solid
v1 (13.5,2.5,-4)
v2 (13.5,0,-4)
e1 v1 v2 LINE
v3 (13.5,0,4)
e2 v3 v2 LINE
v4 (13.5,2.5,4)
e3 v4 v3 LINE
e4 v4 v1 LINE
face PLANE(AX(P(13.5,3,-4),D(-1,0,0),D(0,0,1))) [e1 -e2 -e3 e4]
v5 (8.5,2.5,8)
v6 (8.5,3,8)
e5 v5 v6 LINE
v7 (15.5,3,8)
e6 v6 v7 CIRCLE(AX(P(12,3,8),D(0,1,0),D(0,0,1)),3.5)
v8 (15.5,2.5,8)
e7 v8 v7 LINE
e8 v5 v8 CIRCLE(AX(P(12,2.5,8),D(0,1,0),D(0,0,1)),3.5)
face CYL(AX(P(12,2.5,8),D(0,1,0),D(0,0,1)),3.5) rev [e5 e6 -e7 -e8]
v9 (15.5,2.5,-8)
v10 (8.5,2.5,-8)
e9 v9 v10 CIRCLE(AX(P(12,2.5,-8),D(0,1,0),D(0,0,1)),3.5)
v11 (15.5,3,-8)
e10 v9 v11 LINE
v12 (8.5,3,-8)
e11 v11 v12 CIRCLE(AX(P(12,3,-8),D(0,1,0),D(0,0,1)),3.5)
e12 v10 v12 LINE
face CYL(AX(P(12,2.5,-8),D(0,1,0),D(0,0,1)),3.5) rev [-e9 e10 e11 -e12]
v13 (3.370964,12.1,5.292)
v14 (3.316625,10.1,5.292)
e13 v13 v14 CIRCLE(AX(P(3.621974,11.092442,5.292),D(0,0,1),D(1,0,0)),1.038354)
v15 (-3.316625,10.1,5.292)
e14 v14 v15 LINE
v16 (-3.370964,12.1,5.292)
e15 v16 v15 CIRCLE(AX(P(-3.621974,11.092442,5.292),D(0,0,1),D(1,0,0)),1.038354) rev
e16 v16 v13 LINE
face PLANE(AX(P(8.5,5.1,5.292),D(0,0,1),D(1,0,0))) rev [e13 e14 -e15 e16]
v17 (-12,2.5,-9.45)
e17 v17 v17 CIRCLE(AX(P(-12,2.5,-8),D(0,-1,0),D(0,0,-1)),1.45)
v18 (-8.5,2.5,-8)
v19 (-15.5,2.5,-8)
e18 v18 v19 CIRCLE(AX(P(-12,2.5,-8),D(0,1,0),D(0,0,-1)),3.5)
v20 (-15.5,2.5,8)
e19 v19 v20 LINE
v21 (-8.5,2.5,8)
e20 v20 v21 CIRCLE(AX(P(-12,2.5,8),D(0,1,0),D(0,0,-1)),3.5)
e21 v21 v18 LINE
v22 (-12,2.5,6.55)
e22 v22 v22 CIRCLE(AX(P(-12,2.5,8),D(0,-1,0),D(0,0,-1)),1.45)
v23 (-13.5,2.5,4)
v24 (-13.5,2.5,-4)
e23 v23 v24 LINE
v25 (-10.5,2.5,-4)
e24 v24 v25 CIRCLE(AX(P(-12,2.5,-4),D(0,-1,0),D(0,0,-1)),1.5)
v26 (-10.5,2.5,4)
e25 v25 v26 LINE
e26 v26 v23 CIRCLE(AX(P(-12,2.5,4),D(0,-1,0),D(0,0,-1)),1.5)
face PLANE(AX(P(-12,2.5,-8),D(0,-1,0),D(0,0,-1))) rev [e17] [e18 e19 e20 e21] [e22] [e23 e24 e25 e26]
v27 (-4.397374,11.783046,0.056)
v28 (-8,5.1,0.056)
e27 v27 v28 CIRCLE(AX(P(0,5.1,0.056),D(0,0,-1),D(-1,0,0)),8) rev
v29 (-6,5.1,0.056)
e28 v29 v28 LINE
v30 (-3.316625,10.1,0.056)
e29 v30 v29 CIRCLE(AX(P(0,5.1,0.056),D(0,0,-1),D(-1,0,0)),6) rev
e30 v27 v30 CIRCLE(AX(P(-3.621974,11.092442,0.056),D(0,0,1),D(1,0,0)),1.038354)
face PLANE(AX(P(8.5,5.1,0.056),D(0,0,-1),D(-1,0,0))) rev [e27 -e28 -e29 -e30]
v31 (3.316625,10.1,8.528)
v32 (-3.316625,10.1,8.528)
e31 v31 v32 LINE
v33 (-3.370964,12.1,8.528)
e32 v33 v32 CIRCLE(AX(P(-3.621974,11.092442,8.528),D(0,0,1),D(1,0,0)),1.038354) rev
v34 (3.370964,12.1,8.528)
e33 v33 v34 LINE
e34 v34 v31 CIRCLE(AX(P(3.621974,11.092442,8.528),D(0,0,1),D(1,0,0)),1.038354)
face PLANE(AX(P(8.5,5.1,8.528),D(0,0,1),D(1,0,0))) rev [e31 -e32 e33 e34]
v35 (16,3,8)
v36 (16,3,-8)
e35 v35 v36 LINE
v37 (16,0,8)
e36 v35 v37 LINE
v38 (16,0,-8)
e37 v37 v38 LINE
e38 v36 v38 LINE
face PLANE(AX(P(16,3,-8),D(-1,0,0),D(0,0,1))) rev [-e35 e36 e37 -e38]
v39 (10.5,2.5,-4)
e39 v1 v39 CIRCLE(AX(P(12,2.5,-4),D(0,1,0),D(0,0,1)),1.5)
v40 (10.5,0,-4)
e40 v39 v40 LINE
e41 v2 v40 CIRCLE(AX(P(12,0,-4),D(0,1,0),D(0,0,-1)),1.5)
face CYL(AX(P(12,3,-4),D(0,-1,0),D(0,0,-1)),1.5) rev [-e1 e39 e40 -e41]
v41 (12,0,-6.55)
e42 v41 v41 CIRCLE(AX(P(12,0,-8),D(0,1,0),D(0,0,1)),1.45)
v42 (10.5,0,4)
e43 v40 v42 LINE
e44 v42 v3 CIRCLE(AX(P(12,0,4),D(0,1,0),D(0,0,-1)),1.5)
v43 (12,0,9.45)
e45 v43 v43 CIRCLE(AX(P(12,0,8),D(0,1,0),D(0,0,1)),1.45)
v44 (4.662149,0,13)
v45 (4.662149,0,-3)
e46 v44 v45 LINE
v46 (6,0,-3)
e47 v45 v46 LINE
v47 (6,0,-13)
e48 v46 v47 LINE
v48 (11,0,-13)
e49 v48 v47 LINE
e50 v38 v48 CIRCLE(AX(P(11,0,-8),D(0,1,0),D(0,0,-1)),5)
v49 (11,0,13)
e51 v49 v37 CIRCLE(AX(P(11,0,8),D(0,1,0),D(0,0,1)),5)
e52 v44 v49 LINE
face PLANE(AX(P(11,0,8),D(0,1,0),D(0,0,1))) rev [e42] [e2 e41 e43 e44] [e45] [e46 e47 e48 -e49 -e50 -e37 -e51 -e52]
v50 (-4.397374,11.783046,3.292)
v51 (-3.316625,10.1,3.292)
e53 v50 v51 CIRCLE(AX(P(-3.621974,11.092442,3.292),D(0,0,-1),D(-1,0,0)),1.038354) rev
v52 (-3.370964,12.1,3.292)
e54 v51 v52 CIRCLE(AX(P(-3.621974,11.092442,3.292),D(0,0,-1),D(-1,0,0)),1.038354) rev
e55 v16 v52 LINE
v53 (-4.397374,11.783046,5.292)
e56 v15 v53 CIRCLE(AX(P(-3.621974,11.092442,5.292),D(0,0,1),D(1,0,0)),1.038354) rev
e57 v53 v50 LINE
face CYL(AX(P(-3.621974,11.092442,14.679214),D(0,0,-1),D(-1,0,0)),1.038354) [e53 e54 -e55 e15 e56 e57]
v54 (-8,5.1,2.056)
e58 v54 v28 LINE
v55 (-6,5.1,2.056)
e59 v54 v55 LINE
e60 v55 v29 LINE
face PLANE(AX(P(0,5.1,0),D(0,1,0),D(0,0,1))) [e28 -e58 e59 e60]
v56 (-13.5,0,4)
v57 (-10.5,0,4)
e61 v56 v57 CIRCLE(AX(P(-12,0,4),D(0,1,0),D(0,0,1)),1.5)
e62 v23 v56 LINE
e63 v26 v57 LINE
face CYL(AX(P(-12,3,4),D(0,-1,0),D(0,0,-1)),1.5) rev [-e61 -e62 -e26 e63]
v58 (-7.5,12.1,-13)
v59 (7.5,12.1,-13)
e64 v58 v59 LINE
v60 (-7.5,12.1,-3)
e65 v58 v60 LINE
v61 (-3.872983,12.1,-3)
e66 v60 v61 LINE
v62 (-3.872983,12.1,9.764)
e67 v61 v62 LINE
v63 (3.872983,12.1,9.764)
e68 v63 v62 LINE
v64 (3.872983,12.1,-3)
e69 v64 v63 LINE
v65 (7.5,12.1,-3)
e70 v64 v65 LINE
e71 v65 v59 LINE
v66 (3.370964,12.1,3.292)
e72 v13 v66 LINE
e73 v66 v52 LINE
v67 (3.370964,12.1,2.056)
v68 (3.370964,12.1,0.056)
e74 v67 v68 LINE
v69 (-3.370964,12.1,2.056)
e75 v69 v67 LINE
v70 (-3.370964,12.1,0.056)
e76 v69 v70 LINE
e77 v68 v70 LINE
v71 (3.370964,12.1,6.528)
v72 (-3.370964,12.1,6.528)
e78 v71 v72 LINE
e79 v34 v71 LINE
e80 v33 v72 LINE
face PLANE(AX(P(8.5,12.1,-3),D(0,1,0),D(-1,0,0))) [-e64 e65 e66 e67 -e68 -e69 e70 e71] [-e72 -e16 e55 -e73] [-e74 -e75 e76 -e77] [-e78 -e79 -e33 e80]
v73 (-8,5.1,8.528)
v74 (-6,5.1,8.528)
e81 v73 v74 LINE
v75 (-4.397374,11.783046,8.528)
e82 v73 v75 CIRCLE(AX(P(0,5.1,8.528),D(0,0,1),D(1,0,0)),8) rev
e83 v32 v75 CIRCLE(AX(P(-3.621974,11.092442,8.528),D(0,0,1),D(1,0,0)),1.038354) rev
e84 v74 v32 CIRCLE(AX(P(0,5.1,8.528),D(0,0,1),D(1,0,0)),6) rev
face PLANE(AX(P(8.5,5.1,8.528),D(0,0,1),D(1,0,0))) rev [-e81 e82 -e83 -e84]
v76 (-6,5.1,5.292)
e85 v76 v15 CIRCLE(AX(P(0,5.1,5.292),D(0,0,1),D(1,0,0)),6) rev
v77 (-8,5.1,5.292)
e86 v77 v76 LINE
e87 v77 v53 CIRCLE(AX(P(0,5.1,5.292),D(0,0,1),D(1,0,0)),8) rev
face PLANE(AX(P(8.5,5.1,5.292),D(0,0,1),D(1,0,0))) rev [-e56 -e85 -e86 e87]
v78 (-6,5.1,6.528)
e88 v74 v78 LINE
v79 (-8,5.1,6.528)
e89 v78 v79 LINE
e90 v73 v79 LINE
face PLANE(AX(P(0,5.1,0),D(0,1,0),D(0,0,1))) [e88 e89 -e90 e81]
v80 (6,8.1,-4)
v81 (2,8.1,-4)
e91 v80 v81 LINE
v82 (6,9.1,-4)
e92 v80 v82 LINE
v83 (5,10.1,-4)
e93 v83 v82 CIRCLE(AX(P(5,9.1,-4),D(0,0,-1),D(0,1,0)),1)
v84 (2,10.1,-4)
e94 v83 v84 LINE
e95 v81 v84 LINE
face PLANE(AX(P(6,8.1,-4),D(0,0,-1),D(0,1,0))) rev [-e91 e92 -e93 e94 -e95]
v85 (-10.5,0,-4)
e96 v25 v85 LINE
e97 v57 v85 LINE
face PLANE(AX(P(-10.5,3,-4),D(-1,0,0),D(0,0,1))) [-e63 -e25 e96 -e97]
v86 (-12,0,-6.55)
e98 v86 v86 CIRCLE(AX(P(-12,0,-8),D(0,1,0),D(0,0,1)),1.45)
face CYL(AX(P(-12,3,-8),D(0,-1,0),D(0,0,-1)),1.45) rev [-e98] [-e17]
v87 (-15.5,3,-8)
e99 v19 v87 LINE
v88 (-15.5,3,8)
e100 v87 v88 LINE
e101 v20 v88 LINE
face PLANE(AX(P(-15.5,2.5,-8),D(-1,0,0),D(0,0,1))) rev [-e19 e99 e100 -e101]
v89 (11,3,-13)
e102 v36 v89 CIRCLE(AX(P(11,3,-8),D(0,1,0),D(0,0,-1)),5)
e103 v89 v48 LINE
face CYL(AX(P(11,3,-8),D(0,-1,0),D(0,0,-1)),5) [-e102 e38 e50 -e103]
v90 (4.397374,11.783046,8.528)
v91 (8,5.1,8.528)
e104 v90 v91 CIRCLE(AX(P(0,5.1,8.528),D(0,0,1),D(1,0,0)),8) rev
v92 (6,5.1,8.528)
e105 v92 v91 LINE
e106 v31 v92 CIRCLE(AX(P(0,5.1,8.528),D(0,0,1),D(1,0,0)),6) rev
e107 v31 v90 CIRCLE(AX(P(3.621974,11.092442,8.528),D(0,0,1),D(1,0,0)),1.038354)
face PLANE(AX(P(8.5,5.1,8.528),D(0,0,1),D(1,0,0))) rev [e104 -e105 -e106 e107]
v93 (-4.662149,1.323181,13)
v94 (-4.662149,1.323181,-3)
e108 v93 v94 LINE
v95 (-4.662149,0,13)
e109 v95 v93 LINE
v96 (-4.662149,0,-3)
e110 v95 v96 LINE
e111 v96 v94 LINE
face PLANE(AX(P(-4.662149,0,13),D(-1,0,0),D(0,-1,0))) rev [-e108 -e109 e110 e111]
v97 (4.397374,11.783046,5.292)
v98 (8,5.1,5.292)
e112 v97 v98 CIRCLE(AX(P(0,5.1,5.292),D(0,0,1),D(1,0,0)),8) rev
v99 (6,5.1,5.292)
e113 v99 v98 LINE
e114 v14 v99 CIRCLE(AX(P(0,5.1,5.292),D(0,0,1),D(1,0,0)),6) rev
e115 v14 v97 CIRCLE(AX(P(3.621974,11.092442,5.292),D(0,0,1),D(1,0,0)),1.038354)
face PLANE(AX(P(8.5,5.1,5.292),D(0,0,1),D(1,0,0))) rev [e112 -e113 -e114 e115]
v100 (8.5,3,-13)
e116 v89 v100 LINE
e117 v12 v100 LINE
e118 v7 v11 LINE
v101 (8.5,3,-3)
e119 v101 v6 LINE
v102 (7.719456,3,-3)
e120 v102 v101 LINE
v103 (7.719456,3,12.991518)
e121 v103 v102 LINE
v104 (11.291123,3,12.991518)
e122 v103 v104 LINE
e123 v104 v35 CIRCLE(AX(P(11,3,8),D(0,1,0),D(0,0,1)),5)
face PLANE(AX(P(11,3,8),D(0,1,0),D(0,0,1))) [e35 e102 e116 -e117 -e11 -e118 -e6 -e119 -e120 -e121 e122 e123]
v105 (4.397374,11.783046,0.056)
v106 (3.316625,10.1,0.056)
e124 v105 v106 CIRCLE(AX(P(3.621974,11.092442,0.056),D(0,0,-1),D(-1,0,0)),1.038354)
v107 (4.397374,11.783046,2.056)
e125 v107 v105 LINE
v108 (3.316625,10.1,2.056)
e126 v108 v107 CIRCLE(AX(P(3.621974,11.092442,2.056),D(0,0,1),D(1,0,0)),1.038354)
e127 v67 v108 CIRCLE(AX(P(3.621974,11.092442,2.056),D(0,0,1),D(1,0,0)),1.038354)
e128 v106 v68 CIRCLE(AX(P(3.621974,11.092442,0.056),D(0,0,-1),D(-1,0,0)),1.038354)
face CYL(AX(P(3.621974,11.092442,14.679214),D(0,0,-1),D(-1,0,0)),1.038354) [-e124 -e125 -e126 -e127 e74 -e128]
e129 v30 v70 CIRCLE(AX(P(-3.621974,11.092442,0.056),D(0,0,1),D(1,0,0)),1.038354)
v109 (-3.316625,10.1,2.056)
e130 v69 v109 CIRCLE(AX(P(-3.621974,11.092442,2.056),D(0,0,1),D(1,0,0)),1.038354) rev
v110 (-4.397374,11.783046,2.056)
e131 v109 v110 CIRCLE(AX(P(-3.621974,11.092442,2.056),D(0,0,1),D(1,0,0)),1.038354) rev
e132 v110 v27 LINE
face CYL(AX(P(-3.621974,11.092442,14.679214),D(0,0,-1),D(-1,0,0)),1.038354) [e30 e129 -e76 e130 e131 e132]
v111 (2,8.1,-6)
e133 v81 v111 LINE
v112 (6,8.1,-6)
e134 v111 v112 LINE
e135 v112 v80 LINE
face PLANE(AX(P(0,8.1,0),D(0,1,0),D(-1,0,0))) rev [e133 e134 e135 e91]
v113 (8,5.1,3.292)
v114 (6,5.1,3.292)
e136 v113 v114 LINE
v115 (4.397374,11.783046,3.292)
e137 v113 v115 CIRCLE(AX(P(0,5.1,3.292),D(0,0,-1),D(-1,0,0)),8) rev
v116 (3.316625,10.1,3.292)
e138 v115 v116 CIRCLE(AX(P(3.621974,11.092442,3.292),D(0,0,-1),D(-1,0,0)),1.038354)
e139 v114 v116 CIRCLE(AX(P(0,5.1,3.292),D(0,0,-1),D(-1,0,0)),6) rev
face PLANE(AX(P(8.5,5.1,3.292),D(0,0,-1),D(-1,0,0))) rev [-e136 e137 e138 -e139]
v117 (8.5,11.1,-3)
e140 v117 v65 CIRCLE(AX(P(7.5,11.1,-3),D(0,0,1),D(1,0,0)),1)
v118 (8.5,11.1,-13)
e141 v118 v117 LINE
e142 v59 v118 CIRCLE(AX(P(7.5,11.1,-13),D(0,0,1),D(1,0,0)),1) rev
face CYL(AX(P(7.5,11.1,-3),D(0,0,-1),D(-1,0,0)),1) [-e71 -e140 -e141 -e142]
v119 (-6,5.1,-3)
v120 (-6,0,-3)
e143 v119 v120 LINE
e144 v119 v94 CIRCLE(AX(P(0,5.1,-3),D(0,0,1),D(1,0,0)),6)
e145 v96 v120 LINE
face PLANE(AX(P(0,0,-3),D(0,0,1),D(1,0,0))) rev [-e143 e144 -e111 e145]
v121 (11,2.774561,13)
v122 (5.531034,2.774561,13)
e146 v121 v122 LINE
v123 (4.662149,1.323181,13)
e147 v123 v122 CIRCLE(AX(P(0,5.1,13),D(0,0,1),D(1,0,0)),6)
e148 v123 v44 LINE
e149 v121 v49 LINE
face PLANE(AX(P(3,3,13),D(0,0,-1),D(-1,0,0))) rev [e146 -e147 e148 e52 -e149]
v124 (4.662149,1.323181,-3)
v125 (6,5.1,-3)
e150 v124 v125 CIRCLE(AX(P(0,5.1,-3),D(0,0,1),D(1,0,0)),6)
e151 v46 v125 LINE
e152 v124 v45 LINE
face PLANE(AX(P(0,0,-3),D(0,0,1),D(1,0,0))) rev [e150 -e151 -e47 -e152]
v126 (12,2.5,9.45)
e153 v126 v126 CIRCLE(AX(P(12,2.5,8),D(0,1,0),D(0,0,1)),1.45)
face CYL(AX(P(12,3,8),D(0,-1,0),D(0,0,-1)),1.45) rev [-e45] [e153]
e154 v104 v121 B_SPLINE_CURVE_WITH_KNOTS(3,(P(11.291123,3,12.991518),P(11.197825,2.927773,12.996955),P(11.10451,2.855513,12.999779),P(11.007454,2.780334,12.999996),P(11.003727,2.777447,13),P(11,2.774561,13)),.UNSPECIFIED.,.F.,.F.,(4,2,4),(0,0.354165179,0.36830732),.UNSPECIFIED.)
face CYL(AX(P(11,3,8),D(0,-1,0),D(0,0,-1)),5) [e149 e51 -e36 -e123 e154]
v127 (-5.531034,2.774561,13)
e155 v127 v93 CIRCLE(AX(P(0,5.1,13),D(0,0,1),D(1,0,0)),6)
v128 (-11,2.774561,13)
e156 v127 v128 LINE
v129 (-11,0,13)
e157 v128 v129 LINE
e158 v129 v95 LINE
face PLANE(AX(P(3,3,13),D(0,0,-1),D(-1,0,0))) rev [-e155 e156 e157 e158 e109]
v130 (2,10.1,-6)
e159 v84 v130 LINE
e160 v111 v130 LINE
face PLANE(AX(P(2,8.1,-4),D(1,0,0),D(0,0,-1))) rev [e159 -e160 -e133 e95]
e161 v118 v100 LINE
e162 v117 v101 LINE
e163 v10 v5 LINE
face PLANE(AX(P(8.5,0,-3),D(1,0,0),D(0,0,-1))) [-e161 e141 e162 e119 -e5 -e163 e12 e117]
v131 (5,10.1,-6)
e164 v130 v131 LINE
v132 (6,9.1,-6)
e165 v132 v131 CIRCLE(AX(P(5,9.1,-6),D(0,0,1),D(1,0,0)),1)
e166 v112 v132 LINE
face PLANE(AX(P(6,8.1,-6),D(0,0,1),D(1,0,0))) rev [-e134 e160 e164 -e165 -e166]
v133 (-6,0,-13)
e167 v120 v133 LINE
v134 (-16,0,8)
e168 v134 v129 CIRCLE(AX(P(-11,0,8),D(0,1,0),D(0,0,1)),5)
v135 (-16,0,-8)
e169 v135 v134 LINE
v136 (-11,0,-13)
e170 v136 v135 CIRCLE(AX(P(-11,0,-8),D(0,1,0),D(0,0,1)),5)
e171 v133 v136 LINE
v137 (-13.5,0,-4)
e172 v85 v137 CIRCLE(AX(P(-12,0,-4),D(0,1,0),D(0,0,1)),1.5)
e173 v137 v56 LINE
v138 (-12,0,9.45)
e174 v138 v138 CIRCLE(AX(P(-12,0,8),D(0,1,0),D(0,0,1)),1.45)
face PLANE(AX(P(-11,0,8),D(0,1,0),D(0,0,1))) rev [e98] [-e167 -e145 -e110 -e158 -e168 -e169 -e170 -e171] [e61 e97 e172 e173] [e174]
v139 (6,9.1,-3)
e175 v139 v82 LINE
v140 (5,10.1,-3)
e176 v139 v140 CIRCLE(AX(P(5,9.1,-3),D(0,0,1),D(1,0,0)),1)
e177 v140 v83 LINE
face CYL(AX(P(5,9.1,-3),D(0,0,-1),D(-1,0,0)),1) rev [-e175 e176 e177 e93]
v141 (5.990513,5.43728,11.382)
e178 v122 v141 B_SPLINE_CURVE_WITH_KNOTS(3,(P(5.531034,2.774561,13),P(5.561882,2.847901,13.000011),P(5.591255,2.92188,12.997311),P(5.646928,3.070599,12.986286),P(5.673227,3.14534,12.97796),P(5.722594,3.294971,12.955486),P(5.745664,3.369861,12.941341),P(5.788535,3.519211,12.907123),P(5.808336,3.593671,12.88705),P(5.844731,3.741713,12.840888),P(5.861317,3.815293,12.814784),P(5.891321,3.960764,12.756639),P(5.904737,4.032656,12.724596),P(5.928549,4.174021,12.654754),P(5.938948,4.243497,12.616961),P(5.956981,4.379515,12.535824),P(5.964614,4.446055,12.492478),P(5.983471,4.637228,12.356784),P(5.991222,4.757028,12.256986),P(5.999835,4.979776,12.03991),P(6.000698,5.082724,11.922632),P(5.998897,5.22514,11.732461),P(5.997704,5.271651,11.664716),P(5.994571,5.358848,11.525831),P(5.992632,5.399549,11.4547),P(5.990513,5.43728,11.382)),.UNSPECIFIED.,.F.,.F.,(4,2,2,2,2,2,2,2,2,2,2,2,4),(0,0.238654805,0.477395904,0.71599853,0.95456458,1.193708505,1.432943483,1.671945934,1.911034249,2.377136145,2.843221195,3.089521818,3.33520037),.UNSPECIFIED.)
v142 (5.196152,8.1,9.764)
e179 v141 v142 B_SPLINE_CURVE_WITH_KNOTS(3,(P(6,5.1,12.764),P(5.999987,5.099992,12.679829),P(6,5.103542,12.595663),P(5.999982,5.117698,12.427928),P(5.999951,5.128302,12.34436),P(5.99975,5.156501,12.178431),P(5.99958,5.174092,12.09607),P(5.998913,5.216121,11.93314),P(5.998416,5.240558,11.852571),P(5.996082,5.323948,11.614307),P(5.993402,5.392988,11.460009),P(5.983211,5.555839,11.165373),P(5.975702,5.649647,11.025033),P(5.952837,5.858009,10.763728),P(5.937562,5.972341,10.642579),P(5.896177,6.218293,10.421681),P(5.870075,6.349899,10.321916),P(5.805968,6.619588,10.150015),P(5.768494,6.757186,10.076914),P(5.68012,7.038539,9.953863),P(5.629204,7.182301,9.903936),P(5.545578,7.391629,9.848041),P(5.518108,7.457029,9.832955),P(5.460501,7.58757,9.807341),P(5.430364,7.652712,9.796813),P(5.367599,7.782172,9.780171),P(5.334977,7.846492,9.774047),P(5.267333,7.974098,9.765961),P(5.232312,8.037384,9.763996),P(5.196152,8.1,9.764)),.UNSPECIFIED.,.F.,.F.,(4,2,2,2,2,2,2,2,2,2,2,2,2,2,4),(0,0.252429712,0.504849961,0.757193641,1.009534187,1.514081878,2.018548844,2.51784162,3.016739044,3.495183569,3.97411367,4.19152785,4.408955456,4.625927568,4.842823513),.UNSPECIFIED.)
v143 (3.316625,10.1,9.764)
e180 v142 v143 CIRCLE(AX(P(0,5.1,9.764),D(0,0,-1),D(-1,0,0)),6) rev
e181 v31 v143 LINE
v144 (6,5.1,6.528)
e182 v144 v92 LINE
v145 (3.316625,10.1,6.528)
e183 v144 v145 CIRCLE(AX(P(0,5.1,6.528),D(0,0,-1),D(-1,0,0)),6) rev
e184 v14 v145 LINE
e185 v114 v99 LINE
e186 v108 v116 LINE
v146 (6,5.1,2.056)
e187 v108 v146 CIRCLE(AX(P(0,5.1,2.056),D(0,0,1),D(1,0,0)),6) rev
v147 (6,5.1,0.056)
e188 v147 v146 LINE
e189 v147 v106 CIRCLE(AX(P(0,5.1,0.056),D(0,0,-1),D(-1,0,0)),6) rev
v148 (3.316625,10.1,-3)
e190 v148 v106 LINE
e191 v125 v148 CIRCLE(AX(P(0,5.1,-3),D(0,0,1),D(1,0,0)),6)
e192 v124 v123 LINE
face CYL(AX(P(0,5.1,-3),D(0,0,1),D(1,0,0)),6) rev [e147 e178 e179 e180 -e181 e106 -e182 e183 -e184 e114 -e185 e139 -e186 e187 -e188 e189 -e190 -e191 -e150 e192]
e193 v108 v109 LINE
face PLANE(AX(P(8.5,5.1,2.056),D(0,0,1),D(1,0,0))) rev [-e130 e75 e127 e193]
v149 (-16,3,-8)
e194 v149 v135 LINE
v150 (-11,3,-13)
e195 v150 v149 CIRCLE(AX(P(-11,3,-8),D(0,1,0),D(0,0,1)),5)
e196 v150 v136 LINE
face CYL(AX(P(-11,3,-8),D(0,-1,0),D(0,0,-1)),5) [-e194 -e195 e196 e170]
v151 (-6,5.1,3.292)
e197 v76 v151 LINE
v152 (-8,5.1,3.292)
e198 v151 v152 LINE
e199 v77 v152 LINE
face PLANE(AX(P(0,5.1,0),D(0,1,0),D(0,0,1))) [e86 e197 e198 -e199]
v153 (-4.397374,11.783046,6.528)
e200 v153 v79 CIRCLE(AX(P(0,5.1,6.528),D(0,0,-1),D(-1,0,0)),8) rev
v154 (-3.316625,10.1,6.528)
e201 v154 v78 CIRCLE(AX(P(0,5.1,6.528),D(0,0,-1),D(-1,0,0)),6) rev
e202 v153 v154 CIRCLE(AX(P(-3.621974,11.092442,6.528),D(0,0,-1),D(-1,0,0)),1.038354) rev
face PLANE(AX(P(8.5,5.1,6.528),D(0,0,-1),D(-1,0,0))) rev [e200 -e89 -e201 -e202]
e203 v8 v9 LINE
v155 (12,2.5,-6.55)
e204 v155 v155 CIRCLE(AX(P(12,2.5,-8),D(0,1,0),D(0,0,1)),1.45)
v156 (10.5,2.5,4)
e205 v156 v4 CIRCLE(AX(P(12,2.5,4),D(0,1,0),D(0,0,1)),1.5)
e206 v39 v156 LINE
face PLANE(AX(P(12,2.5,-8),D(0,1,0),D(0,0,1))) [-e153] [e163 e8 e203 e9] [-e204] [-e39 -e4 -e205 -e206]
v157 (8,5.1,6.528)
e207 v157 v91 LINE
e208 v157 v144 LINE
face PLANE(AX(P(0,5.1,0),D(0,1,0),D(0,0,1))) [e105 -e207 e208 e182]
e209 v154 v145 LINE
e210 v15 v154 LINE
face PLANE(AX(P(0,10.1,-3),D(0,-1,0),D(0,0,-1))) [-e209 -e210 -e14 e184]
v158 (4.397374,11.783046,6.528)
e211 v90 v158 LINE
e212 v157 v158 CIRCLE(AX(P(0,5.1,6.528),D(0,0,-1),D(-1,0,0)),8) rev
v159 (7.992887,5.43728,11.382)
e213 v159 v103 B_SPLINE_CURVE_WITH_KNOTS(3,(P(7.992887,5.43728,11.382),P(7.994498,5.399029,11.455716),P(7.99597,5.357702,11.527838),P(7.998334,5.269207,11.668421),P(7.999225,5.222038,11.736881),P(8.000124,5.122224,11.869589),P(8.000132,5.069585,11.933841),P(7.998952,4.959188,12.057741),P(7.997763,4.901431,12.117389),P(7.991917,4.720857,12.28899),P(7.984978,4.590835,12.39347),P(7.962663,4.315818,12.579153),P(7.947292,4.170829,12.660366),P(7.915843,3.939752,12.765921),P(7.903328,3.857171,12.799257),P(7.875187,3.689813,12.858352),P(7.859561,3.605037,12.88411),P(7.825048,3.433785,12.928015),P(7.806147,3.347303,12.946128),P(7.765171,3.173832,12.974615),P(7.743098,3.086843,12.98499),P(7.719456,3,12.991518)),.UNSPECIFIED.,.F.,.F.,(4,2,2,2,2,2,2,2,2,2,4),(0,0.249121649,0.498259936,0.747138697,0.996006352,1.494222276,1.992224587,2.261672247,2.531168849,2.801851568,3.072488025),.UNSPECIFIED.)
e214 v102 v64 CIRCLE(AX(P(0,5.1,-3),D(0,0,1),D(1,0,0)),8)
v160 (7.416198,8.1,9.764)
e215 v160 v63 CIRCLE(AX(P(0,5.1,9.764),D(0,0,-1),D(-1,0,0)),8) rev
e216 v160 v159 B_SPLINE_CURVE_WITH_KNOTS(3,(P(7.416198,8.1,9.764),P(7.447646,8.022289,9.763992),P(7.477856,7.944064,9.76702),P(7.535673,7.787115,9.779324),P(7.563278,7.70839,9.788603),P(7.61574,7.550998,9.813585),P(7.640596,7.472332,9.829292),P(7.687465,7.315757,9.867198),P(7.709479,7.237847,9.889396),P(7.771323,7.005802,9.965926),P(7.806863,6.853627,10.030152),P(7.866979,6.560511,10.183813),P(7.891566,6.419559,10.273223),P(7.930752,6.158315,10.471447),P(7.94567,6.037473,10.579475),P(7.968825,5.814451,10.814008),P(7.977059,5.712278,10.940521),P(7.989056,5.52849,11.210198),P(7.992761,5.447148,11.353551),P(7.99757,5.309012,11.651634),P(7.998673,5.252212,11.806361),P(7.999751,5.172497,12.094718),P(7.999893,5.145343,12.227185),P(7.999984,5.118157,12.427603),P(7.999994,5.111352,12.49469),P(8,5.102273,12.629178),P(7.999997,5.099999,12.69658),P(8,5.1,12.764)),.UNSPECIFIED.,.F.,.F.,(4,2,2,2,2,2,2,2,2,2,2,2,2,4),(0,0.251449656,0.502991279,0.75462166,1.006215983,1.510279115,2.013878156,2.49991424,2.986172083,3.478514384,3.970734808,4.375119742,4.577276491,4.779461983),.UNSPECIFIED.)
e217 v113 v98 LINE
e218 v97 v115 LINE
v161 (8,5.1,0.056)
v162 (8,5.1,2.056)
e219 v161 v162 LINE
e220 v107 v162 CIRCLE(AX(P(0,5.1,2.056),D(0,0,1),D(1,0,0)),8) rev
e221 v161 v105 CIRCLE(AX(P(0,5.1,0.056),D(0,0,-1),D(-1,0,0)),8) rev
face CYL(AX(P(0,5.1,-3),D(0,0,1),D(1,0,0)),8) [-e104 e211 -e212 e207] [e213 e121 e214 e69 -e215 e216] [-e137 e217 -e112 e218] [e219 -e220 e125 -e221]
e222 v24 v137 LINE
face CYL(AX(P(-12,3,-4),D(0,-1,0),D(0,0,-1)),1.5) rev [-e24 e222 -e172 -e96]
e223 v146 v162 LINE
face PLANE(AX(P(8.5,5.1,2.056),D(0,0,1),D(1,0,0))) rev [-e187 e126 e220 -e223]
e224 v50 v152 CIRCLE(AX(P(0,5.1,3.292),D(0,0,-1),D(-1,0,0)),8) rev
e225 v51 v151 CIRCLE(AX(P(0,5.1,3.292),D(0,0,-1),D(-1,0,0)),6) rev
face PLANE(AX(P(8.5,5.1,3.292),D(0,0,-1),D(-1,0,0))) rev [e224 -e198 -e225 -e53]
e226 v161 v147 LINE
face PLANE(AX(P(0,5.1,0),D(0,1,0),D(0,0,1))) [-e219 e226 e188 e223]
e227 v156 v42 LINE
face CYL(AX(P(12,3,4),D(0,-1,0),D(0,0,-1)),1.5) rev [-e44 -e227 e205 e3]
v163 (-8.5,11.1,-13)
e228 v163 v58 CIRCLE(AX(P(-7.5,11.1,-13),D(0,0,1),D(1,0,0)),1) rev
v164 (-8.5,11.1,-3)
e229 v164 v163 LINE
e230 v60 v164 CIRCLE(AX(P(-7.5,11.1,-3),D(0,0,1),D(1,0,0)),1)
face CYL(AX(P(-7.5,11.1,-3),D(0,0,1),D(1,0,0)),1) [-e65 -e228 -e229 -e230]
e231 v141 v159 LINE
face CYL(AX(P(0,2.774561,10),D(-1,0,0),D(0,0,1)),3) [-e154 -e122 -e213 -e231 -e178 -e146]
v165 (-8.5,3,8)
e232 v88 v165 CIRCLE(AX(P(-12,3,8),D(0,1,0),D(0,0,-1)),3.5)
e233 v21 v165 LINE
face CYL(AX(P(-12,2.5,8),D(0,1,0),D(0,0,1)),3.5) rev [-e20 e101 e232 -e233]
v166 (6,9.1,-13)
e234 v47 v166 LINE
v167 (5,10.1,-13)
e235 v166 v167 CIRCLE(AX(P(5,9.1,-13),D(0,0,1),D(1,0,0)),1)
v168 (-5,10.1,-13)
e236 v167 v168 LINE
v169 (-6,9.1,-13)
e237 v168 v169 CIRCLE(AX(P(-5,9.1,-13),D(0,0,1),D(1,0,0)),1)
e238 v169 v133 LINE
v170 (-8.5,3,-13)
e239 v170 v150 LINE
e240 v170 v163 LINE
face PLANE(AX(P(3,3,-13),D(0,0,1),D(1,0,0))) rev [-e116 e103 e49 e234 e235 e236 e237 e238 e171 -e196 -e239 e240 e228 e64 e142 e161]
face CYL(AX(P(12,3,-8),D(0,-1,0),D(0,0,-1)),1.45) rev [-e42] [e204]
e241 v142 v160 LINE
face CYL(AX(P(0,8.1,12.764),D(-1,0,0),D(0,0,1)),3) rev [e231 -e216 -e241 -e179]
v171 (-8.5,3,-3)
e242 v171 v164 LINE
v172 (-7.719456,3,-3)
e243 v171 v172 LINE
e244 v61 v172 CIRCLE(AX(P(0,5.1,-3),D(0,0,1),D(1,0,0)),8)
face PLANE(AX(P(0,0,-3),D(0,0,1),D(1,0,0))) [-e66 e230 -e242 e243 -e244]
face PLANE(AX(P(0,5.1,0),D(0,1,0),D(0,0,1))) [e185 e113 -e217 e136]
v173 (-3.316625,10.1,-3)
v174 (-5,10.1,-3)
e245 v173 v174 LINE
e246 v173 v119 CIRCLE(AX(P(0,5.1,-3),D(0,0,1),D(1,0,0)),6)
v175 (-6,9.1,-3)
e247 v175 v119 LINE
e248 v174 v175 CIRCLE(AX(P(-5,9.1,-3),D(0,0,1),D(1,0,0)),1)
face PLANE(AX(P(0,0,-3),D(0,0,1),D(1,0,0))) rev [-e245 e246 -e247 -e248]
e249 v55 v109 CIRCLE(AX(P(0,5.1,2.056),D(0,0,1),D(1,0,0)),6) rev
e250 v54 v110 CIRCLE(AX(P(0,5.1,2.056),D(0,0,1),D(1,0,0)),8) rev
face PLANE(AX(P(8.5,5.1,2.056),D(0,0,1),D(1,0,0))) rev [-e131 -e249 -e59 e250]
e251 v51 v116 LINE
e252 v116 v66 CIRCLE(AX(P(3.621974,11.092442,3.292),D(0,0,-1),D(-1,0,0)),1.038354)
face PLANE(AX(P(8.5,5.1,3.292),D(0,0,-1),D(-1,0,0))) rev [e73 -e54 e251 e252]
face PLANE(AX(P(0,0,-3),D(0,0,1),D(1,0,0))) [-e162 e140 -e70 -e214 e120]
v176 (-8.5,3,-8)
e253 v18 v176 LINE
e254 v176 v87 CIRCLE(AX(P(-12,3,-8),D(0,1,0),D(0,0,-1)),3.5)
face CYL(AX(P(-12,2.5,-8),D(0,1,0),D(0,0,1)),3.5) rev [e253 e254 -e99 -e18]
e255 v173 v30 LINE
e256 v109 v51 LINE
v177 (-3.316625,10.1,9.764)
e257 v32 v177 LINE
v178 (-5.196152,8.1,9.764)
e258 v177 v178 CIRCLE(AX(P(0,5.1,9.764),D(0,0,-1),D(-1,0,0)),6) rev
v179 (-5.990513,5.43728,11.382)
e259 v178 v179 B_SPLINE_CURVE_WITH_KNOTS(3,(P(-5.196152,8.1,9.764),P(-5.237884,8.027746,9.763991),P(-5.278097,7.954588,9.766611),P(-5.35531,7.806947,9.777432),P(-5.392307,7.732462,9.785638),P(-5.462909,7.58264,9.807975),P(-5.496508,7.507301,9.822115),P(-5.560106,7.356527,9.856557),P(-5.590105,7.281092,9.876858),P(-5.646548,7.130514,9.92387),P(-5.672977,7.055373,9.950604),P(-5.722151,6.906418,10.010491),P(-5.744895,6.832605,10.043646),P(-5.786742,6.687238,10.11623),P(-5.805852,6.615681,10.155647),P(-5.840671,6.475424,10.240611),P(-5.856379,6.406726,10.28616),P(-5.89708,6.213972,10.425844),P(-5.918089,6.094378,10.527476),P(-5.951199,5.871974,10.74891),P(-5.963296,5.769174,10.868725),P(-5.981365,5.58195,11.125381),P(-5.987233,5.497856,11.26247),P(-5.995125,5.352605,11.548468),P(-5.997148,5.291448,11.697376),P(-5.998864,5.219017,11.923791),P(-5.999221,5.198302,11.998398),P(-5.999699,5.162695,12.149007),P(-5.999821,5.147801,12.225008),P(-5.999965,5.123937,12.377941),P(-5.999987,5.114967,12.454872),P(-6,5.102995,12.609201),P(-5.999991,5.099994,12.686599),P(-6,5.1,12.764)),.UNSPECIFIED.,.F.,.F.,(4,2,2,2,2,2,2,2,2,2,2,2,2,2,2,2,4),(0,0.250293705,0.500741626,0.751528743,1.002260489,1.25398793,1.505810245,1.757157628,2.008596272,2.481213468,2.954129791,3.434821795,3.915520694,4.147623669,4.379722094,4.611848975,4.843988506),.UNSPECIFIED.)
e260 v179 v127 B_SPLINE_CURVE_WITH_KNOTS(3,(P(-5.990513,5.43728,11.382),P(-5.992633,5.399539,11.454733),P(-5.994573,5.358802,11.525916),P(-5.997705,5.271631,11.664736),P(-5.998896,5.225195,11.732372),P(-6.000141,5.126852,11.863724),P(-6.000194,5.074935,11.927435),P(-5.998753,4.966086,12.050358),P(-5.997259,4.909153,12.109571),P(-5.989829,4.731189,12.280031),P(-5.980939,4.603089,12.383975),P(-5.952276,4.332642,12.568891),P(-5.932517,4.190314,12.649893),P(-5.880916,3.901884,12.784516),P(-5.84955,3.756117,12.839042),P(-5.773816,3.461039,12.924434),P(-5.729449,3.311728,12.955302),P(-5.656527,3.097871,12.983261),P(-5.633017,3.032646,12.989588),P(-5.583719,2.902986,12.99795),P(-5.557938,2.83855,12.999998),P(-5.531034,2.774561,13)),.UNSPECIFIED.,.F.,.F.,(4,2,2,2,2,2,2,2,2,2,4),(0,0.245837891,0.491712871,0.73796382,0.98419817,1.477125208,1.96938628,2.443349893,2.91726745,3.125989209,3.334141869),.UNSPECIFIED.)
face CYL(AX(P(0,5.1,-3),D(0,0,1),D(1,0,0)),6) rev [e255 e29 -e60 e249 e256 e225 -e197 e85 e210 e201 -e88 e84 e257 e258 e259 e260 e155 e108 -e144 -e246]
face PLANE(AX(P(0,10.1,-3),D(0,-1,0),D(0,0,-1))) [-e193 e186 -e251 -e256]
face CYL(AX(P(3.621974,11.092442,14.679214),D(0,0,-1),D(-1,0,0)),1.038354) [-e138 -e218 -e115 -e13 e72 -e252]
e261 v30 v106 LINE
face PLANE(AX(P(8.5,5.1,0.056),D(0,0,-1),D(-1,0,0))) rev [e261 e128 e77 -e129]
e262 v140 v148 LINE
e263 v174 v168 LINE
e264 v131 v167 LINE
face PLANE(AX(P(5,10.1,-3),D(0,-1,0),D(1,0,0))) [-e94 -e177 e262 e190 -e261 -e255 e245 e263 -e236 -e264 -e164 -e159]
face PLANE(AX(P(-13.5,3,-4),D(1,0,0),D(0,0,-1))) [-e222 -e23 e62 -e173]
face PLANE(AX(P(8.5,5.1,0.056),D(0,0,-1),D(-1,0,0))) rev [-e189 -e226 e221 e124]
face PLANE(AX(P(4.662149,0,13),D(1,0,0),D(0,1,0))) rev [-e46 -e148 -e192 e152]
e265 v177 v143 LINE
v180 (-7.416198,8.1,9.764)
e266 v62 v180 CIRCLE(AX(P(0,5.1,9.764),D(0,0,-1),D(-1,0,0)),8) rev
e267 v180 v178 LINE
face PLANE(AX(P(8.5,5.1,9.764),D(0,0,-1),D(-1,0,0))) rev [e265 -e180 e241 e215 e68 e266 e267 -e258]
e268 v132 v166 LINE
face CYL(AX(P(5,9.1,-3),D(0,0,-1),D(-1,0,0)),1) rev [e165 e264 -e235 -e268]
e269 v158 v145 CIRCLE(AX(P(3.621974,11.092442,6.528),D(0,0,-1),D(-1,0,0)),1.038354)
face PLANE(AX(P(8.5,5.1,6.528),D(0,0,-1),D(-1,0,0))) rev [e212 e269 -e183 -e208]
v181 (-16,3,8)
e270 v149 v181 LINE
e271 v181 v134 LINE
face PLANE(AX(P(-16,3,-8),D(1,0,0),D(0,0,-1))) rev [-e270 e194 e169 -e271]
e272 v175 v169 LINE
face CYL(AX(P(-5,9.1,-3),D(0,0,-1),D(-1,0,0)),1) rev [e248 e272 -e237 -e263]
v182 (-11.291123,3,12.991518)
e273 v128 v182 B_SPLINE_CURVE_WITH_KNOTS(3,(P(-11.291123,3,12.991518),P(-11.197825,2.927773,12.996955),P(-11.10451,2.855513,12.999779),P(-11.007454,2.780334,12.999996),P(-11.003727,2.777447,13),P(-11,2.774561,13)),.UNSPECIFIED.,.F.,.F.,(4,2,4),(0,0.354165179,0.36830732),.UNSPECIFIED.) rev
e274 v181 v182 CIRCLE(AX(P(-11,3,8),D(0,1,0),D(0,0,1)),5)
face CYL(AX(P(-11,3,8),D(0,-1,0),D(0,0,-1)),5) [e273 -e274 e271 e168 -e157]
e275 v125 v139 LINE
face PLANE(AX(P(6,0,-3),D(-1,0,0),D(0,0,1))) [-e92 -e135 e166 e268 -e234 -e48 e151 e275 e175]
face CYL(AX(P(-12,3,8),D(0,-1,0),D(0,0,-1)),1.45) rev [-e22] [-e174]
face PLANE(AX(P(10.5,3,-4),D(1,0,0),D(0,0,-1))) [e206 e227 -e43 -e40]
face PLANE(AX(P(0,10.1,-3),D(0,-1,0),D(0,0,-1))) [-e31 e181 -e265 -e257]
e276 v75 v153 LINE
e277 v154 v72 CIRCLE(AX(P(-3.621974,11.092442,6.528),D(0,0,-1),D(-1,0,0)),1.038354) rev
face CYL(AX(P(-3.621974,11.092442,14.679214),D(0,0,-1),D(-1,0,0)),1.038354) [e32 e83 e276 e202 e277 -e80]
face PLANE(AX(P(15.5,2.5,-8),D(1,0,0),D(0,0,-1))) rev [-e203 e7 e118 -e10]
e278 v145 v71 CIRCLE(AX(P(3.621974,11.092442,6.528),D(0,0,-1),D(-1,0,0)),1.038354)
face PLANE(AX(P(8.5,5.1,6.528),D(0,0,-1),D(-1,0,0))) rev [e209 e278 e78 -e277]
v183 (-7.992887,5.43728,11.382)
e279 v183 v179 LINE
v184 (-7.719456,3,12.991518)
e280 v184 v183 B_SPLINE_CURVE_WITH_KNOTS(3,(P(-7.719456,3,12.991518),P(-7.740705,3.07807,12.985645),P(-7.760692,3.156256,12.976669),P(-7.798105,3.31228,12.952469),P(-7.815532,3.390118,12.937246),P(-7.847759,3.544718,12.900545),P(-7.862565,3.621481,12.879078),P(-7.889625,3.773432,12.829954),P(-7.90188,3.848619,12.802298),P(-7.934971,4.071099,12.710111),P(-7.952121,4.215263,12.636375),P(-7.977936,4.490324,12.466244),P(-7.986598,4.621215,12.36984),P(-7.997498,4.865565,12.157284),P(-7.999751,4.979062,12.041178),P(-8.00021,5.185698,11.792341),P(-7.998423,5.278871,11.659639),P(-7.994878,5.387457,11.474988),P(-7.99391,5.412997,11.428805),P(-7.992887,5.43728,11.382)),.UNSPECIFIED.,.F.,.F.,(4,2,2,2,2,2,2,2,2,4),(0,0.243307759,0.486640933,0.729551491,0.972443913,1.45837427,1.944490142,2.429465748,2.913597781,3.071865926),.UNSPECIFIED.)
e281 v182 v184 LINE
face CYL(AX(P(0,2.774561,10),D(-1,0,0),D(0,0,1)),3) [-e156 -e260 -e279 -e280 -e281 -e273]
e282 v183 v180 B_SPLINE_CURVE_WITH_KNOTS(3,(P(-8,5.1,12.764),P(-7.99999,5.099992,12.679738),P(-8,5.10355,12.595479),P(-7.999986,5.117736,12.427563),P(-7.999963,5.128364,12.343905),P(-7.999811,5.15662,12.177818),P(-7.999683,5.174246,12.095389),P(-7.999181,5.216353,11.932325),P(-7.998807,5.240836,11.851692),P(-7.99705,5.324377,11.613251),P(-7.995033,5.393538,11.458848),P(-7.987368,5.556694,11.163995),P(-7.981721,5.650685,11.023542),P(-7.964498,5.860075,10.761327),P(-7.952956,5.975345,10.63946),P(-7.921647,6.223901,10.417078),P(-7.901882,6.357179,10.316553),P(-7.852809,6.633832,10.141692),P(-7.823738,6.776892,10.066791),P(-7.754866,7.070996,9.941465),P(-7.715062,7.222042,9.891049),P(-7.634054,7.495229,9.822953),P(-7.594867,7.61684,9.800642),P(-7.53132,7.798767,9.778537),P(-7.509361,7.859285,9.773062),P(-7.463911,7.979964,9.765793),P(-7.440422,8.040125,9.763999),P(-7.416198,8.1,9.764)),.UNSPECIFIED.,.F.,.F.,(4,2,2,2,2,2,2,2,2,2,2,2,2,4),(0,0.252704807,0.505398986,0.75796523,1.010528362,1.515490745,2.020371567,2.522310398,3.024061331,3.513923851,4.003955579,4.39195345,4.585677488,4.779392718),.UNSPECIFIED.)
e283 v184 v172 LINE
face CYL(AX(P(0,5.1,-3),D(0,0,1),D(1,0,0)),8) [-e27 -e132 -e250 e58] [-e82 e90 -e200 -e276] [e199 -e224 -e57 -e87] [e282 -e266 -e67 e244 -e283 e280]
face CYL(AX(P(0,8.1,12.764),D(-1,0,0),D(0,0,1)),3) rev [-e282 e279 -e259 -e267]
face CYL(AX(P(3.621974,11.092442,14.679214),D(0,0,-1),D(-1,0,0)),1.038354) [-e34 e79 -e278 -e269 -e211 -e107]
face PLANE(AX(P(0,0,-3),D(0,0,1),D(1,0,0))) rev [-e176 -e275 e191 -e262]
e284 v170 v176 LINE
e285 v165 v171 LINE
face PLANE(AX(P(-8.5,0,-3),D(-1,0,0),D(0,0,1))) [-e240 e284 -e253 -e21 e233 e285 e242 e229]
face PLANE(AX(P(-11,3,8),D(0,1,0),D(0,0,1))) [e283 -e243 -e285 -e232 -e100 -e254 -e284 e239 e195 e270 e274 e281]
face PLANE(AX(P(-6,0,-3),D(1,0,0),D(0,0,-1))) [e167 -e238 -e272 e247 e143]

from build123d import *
from build123d.topology import SkipClean

# Parameters (mm, degrees)
SKETCH_1_R               = 1.45
EXTRUDE_1_DEPTH          = 3
EXTRUDE_1_2_DEPTH        = 3
EXTRUDE_3_DEPTH          = 16
OTHER_START              = -3
OTHER_2_DEPTH            = 16
OTHER_2_2_DEPTH          = 16
OTHER_2_3_DEPTH          = 16
OTHER_START_2            = -4
OTHER_2_4_OUTLINE_W      = 18
OTHER_2_4_OUTLINE_H      = 16
OTHER_2_4_DEPTH          = 7
OTHER_2_5_DEPTH          = 16
EXTRUDE_5_DEPTH          = 10
OTHER_START_3            = -13
OTHER_5_OUTLINE_W        = 2.5
OTHER_5_OUTLINE_H        = 3
OTHER_5_DEPTH            = 10
OTHER_5_2_OUTLINE_W      = 5.5
OTHER_5_2_OUTLINE_H      = 3
OTHER_5_2_DEPTH          = 10
OTHER_5_3_DEPTH          = 16
OTHER_START_4            = 6
OTHER_5_4_OUTLINE_W      = 3
OTHER_5_4_OUTLINE_H      = 10
OTHER_5_4_DEPTH          = 2.5
OTHER_5_5_OUTLINE_W      = 2.5
OTHER_5_5_OUTLINE_H      = 10
OTHER_5_5_DEPTH          = 3
OTHER_5_6_OUTLINE_W      = 5.5
OTHER_5_6_OUTLINE_H      = 3
OTHER_5_6_DEPTH          = 10
OTHER_5_7_DEPTH          = 16
FILLET_1_R               = 1
FILLET_2_R               = 1
SKETCH_6_W               = 9.324298968
SKETCH_6_H               = 3
CUT_EXTRUDE_1_DEPTH      = 26.659501164
SKETCH_7_W               = 4
SKETCH_7_H               = 2
EXTRUDE_6_DEPTH          = 2
SKETCH_8_W               = 17
SKETCH_8_H               = 2
CUT_EXTRUDE_2_DEPTH      = 7
EXTRUDE_7_DEPTH          = 11.708
CUT_EXTRUDE_6_DEPTH      = 0.5
CUT_EXTRUDE_7_DEPTH      = 24.904183734
CUT_EXTRUDE_7_DEPTH_BACK = 24.904183734
SKETCH_12_W              = 3.236
SKETCH_12_H              = 7
FILLET_3_R               = 3
FILLET_4_R               = 3


with BuildPart() as part:
    # Эскиз1 → Бобышка-Вытянуть1 (new body)
    with BuildSketch(Plane(origin=(0, 0, 0), x_dir=(1, 0, 0), z_dir=(0, 1, 0))):
        with BuildLine():
            Line((-11, 13), (-3, 13))
            Line((-3, 13), (-3, -13))
            Line((-3, -13), (-11, -13))
            ThreePointArc((-11, -13), (-14.535533906, -11.535533906), (-16, -8))
            Line((-16, -8), (-16, 8))
            ThreePointArc((-16, 8), (-14.535533906, 11.535533906), (-11, 13))
        make_face()
        with Locations(Location((-12, 8, 0), (0, 0, 270))):
            Circle(SKETCH_1_R, mode=Mode.SUBTRACT)
        with Locations(Location((-12, -8, 0), (0, 0, 270))):
            Circle(SKETCH_1_R, mode=Mode.SUBTRACT)
        with BuildLine():
            Line((-10.5, 4), (-10.5, -4))
            ThreePointArc((-10.5, -4), (-12, -5.5), (-13.5, -4))
            Line((-13.5, -4), (-13.5, 4))
            ThreePointArc((-13.5, 4), (-12, 5.5), (-10.5, 4))
        make_face(mode=Mode.SUBTRACT)
    extrude(amount=EXTRUDE_1_DEPTH)

    # Other 2 5 outline → Other 2 5 (cut)
    with BuildSketch(Plane.XY.offset(OTHER_START)):
        with BuildLine():
            ThreePointArc((-3.160696126, 0), (-4.63975683, 1.295705511), (-5.620498199, 3))
            Line((-5.620498199, 3), (-7.719455939, 3))
            ThreePointArc((-7.719455939, 3), (-7.101748396, 1.416907588), (-6.163602842, 0))
            Line((-6.163602842, 0), (-3.160696126, 0))
        make_face()
    extrude(amount=OTHER_2_5_DEPTH, mode=Mode.SUBTRACT)

    # Other 5 2 outline → Other 5 2 (cut)
    with BuildSketch(Plane.XY.offset(OTHER_START_3)):
        with Locations((-5.75, 1.5)):
            Rectangle(OTHER_5_2_OUTLINE_W, OTHER_5_2_OUTLINE_H)
    extrude(amount=OTHER_5_2_DEPTH, mode=Mode.SUBTRACT)

    # Other 5 3 outline → Other 5 3 (cut)
    with BuildSketch(Plane.XY.offset(OTHER_START)):
        with BuildLine():
            Line((-3, 3), (-5.620498199, 3))
            ThreePointArc((-5.620498199, 3), (-4.63975683, 1.295705511), (-3.160696126, 0))
            Line((-3.160696126, 0), (-3, 0))
            Line((-3, 0), (-3, 3))
        make_face()
    extrude(amount=OTHER_5_3_DEPTH, mode=Mode.SUBTRACT)


with BuildPart() as body_2:
    # Эскиз1 → Extrude 1 2 (new body)
    with BuildSketch(Plane(origin=(0, 0, 0), x_dir=(1, 0, 0), z_dir=(0, 1, 0))):
        with BuildLine():
            Line((3, 13), (11, 13))
            ThreePointArc((11, 13), (14.535533906, 11.535533906), (16, 8))
            Line((16, 8), (16, -8))
            ThreePointArc((16, -8), (14.535533906, -11.535533906), (11, -13))
            Line((11, -13), (3, -13))
            Line((3, -13), (3, 13))
        make_face()
        with Locations(Location((12, 8, 0), (0, 0, 270))):
            Circle(SKETCH_1_R, mode=Mode.SUBTRACT)
        with Locations(Location((12, -8, 0), (0, 0, 270))):
            Circle(SKETCH_1_R, mode=Mode.SUBTRACT)
        with BuildLine():
            Line((10.5, 4), (10.5, -4))
            ThreePointArc((10.5, -4), (12, -5.5), (13.5, -4))
            Line((13.5, -4), (13.5, 4))
            ThreePointArc((13.5, 4), (12, 5.5), (10.5, 4))
        make_face(mode=Mode.SUBTRACT)
    extrude(amount=EXTRUDE_1_2_DEPTH)

    # Other 2 3 outline → Other 2 3 (cut)
    with BuildSketch(Plane.XY.offset(OTHER_START)):
        with BuildLine():
            ThreePointArc((5.620498199, 3), (4.63975683, 1.295705511), (3.160696126, 0))
            Line((3.160696126, 0), (6.163602842, 0))
            ThreePointArc((6.163602842, 0), (7.101748396, 1.416907588), (7.719455939, 3))
            Line((7.719455939, 3), (5.620498199, 3))
        make_face()
    extrude(amount=OTHER_2_3_DEPTH, mode=Mode.SUBTRACT)

    # Other 5 6 outline → Other 5 6 (cut)
    with BuildSketch(Plane.XY.offset(OTHER_START_3)):
        with Locations((5.75, 1.5)):
            Rectangle(OTHER_5_6_OUTLINE_W, OTHER_5_6_OUTLINE_H)
    extrude(amount=OTHER_5_6_DEPTH, mode=Mode.SUBTRACT)

    # Other 5 7 outline → Other 5 7 (cut)
    with BuildSketch(Plane.XY.offset(OTHER_START)):
        with BuildLine():
            Line((3, 0), (3.160696126, 0))
            ThreePointArc((3.160696126, 0), (4.63975683, 1.295705511), (5.620498199, 3))
            Line((5.620498199, 3), (3, 3))
            Line((3, 3), (3, 0))
        make_face()
    extrude(amount=OTHER_5_7_DEPTH, mode=Mode.SUBTRACT)


with BuildPart() as body_3:
    # Эскиз4 → Бобышка-Вытянуть3 (new body)
    with BuildSketch(Plane.XY.offset(13)):
        with BuildLine():
            Line((3.872983346, 12.1), (-3.872983346, 12.1))
            ThreePointArc((-3.872983346, 12.1), (0, -2.9), (3.872983346, 12.1))
        make_face()
        with BuildLine():
            Line((-3.31662479, 10.1), (3.31662479, 10.1))
            ThreePointArc((3.31662479, 10.1), (0, -0.9), (-3.31662479, 10.1))
        make_face(mode=Mode.SUBTRACT)
    extrude(amount=-EXTRUDE_3_DEPTH)

    # Other 2 4 outline → Other 2 4 (cut)
    with BuildSketch(Plane(origin=(0, 0, 0), x_dir=(1, 0, 0), z_dir=(0, 1, 0)).offset(OTHER_START_2)):
        with Locations((0, -5)):
            Rectangle(OTHER_2_4_OUTLINE_W, OTHER_2_4_OUTLINE_H)
    extrude(amount=OTHER_2_4_DEPTH, mode=Mode.SUBTRACT)

    # Эскиз8 → Вырез-Вытянуть2 (cut)
    with BuildSketch(Plane(origin=(0, 12.1, 0), x_dir=(1, 0, 0), z_dir=(0, 1, 0))):
        with Locations((0, -1.056)):
            Rectangle(SKETCH_8_W, SKETCH_8_H)
        with Locations((0, -4.292)):
            Rectangle(SKETCH_8_W, SKETCH_8_H)
        with Locations((0, -7.528)):
            Rectangle(SKETCH_8_W, SKETCH_8_H)
        with Locations((0, -10.764)):
            Rectangle(SKETCH_8_W, SKETCH_8_H)
    extrude(amount=-CUT_EXTRUDE_2_DEPTH, mode=Mode.SUBTRACT)

    # Эскиз9 → Бобышка-Вытянуть7 (add)
    with SkipClean():  # the faces are left unmerged after this step: merging them gives an invalid solid
        with BuildSketch(Plane.XY.offset(0.056)):
            with BuildLine():
                Line((3.872983346, 12.1), (3.370964166, 12.1))
                ThreePointArc((3.370964166, 12.1), (3.315605963, 10.10031404), (4.397373599, 11.783046119))
                ThreePointArc((4.397373599, 11.783046119), (4.1382141, 11.946545411), (3.872983346, 12.1))
            make_face()
            with BuildLine():
                Line((-3.872983346, 12.1), (-3.370964166, 12.1))
                ThreePointArc((-3.370964166, 12.1), (-3.315605963, 10.10031404), (-4.397373599, 11.783046119))
                ThreePointArc((-4.397373599, 11.783046119), (-4.1382141, 11.946545411), (-3.872983346, 12.1))
            make_face()
        extrude(amount=EXTRUDE_7_DEPTH)


with BuildPart() as body_4:
    # Пересечение2: read off the stored shape, not the designer's step
    # Пересечение2 outline → Пересечение2 (new body)
    with BuildSketch(Plane.XY.offset(OTHER_START)):
        with BuildLine():
            ThreePointArc((-3.160696126, 0), (-4.63975683, 1.295705511), (-5.620498199, 3))
            Line((-5.620498199, 3), (-7.719455939, 3))
            ThreePointArc((-7.719455939, 3), (-7.101748396, 1.416907588), (-6.163602842, 0))
            Line((-6.163602842, 0), (-3.160696126, 0))
        make_face()
    extrude(amount=OTHER_2_DEPTH)


with BuildPart() as body_5:
    # Other 2 2 outline → Other 2 2 (new body)
    with BuildSketch(Plane.XY.offset(OTHER_START)):
        with BuildLine():
            ThreePointArc((6.163602842, 0), (7.101748396, 1.416907588), (7.719455939, 3))
            Line((7.719455939, 3), (5.620498199, 3))
            ThreePointArc((5.620498199, 3), (4.63975683, 1.295705511), (3.160696126, 0))
            Line((3.160696126, 0), (6.163602842, 0))
        make_face()
    extrude(amount=OTHER_2_2_DEPTH)


with BuildPart() as body_6:
    # Эскиз5 → Бобышка-Вытянуть5 (new body)
    with BuildSketch(Plane(origin=(0, 0, -13), x_dir=(-1, 0, 0), z_dir=(0, 0, -1))):
        with BuildLine():
            Line((-8.5, 0), (-6, 0))
            Line((-6, 0), (-6, 9.1))
            ThreePointArc((-6, 9.1), (-5.707106781, 9.807106781), (-5, 10.1))
            Line((-5, 10.1), (5, 10.1))
            ThreePointArc((5, 10.1), (5.707106781, 9.807106781), (6, 9.1))
            Line((6, 9.1), (6, 0))
            Line((6, 0), (8.5, 0))
            Line((8.5, 0), (8.5, 12.1))
            Line((8.5, 12.1), (-8.5, 12.1))
            Line((-8.5, 12.1), (-8.5, 0))
        make_face()
    extrude(amount=-EXTRUDE_5_DEPTH)

    # Other 5 5 outline → Other 5 5 (cut)
    with BuildSketch(Plane(origin=(0, 0, 0), x_dir=(1, 0, 0), z_dir=(0, 1, 0))):
        with Locations((7.25, 8)):
            Rectangle(OTHER_5_5_OUTLINE_W, OTHER_5_5_OUTLINE_H)
        with Locations((-7.25, 8)):
            Rectangle(OTHER_5_5_OUTLINE_W, OTHER_5_5_OUTLINE_H)
    extrude(amount=OTHER_5_5_DEPTH, mode=Mode.SUBTRACT)

    # Скругление1
    fillet_1_edges = [body_6.edges().sort_by_distance(p)[0] for p in [
        (8.5, 12.1, -8),
    ]]
    fillet(fillet_1_edges, radius=FILLET_1_R)

    # Скругление2
    fillet_2_edges = [body_6.edges().sort_by_distance(p)[0] for p in [
        (-8.5, 12.1, -8),
    ]]
    fillet(fillet_2_edges, radius=FILLET_2_R)

    # Эскиз7 → Бобышка-Вытянуть6 (add)
    with BuildSketch(Plane.XZ.offset(-10.1)):
        with Locations((4, -5)):
            Rectangle(SKETCH_7_W, SKETCH_7_H)
    extrude(amount=EXTRUDE_6_DEPTH)


with BuildPart() as body_7:
    # Пересечение5: read off the stored shape, not the designer's step
    # Пересечение5 outline → Пересечение5 (new body)
    with BuildSketch(Plane.XY.offset(OTHER_START_3)):
        with Locations((-7.25, 1.5)):
            Rectangle(OTHER_5_OUTLINE_W, OTHER_5_OUTLINE_H)
    extrude(amount=OTHER_5_DEPTH)


with BuildPart() as body_8:
    # Other 5 4 outline → Other 5 4 (new body)
    with BuildSketch(Plane.YZ.offset(OTHER_START_4)):
        with Locations((1.5, -8)):
            Rectangle(OTHER_5_4_OUTLINE_W, OTHER_5_4_OUTLINE_H)
    extrude(amount=OTHER_5_4_DEPTH)


with BuildPart() as cut_extrude_1_tool:
    # Эскиз6 → Вырез-Вытянуть1 (new, through all)
    with BuildSketch(Plane(origin=(0, 0, -3), x_dir=(-1, 0, 0), z_dir=(0, 0, -1))):
        with Locations((0, 1.5)):
            Rectangle(SKETCH_6_W, SKETCH_6_H)
    extrude(amount=-CUT_EXTRUDE_1_DEPTH)


with BuildPart() as body_4_1:
    add(body_4.part)

    # Вырез-Вытянуть1: cut by cut_extrude_1_tool
    add(cut_extrude_1_tool.part, mode=Mode.SUBTRACT)


with BuildPart() as body_5_1:
    add(body_5.part)

    # Вырез-Вытянуть1: cut by cut_extrude_1_tool
    add(cut_extrude_1_tool.part, mode=Mode.SUBTRACT)


with BuildPart() as body_2_1:
    add(body_2.part)

    # Combine 1: union body 6, body 5, body 8, body 3, body 4, part, body 7
    add(body_6.part)
    add(body_5_1.part)
    add(body_8.part)
    add(body_3.part)
    add(body_4_1.part)
    add(part.part)
    add(body_7.part)

    # Эскиз11 → Вырез-Вытянуть6 (cut)
    with SkipClean():  # the faces are left unmerged after this step: merging them gives an invalid solid
        with BuildSketch(Plane(origin=(0, 3, 0), x_dir=(1, 0, 0), z_dir=(0, 1, 0))):
            with BuildLine():
                Line((15.5, 8), (15.5, -8))
                ThreePointArc((15.5, -8), (12, -11.5), (8.5, -8))
                Line((8.5, -8), (8.5, 8))
                ThreePointArc((8.5, 8), (12, 11.5), (15.5, 8))
            make_face()
            with BuildLine():
                Line((-15.5, 8), (-15.5, -8))
                ThreePointArc((-15.5, -8), (-12, -11.5), (-8.5, -8))
                Line((-8.5, -8), (-8.5, 8))
                ThreePointArc((-8.5, 8), (-12, 11.5), (-15.5, 8))
            make_face()
        extrude(amount=-CUT_EXTRUDE_6_DEPTH, mode=Mode.SUBTRACT)

    # Эскиз12 → Вырез-Вытянуть7 (cut, two sides: drawn at the far end of the back side and taken through both)
    with SkipClean():  # the faces are left unmerged after this step: merging them gives an invalid solid
        with BuildSketch(Plane(origin=(0, 0, 0), x_dir=(0, 0, -1), z_dir=(1, 0, 0)).offset(-CUT_EXTRUDE_7_DEPTH_BACK)):
            with Locations((-11.382, 8.6)):
                Rectangle(SKETCH_12_W, SKETCH_12_H)
        extrude(amount=CUT_EXTRUDE_7_DEPTH + CUT_EXTRUDE_7_DEPTH_BACK, mode=Mode.SUBTRACT)

    # Скругление3
    fillet_3_edges = [body_2_1.edges().sort_by_distance(p)[0] for p in [
        (7, 5.1, 9.764),
        (-7, 5.1, 9.764),
    ]]
    fillet(fillet_3_edges, radius=FILLET_3_R)

    # Скругление4
    # the kernel refuses this fillet: 3 mm, written as the material it takes off along each edge
    with BuildSketch(Plane(origin=(-13.813598312, 5.1, 13), x_dir=(0, 0.20406849024989715, -0.9789566135877155), z_dir=(1, 0, 0)), Plane(origin=(0.186401688, 5.1, 13), x_dir=(0, 0.20406849024989818, -0.9789566135877152), z_dir=(1, 0, 0))) as fillet_4_piece_1:
        with BuildLine():
            CenterArc((2.462320949, -2.888709677), FILLET_4_R, 105.65515986, 62.569865346)
            Line((-0.474548892, -2.276504206), (-0.768235876, -2.215283659))
            Line((-0.768235876, -2.215283659), (-0.293686984, 0.061220547))
            Line((-0.293686984, 0.061220547), (0.061220547, 0.293686984))
            ThreePointArc((0.061220547, 0.293686984), (0.292254308, 0.24552682), (1.571826004, 0.288870968))
            Line((1.571826004, 0.288870968), (1.65278009, 0))
        make_face()
    extrude(amount=13.627196623, mode=Mode.SUBTRACT)


solid = body_2_1.part
